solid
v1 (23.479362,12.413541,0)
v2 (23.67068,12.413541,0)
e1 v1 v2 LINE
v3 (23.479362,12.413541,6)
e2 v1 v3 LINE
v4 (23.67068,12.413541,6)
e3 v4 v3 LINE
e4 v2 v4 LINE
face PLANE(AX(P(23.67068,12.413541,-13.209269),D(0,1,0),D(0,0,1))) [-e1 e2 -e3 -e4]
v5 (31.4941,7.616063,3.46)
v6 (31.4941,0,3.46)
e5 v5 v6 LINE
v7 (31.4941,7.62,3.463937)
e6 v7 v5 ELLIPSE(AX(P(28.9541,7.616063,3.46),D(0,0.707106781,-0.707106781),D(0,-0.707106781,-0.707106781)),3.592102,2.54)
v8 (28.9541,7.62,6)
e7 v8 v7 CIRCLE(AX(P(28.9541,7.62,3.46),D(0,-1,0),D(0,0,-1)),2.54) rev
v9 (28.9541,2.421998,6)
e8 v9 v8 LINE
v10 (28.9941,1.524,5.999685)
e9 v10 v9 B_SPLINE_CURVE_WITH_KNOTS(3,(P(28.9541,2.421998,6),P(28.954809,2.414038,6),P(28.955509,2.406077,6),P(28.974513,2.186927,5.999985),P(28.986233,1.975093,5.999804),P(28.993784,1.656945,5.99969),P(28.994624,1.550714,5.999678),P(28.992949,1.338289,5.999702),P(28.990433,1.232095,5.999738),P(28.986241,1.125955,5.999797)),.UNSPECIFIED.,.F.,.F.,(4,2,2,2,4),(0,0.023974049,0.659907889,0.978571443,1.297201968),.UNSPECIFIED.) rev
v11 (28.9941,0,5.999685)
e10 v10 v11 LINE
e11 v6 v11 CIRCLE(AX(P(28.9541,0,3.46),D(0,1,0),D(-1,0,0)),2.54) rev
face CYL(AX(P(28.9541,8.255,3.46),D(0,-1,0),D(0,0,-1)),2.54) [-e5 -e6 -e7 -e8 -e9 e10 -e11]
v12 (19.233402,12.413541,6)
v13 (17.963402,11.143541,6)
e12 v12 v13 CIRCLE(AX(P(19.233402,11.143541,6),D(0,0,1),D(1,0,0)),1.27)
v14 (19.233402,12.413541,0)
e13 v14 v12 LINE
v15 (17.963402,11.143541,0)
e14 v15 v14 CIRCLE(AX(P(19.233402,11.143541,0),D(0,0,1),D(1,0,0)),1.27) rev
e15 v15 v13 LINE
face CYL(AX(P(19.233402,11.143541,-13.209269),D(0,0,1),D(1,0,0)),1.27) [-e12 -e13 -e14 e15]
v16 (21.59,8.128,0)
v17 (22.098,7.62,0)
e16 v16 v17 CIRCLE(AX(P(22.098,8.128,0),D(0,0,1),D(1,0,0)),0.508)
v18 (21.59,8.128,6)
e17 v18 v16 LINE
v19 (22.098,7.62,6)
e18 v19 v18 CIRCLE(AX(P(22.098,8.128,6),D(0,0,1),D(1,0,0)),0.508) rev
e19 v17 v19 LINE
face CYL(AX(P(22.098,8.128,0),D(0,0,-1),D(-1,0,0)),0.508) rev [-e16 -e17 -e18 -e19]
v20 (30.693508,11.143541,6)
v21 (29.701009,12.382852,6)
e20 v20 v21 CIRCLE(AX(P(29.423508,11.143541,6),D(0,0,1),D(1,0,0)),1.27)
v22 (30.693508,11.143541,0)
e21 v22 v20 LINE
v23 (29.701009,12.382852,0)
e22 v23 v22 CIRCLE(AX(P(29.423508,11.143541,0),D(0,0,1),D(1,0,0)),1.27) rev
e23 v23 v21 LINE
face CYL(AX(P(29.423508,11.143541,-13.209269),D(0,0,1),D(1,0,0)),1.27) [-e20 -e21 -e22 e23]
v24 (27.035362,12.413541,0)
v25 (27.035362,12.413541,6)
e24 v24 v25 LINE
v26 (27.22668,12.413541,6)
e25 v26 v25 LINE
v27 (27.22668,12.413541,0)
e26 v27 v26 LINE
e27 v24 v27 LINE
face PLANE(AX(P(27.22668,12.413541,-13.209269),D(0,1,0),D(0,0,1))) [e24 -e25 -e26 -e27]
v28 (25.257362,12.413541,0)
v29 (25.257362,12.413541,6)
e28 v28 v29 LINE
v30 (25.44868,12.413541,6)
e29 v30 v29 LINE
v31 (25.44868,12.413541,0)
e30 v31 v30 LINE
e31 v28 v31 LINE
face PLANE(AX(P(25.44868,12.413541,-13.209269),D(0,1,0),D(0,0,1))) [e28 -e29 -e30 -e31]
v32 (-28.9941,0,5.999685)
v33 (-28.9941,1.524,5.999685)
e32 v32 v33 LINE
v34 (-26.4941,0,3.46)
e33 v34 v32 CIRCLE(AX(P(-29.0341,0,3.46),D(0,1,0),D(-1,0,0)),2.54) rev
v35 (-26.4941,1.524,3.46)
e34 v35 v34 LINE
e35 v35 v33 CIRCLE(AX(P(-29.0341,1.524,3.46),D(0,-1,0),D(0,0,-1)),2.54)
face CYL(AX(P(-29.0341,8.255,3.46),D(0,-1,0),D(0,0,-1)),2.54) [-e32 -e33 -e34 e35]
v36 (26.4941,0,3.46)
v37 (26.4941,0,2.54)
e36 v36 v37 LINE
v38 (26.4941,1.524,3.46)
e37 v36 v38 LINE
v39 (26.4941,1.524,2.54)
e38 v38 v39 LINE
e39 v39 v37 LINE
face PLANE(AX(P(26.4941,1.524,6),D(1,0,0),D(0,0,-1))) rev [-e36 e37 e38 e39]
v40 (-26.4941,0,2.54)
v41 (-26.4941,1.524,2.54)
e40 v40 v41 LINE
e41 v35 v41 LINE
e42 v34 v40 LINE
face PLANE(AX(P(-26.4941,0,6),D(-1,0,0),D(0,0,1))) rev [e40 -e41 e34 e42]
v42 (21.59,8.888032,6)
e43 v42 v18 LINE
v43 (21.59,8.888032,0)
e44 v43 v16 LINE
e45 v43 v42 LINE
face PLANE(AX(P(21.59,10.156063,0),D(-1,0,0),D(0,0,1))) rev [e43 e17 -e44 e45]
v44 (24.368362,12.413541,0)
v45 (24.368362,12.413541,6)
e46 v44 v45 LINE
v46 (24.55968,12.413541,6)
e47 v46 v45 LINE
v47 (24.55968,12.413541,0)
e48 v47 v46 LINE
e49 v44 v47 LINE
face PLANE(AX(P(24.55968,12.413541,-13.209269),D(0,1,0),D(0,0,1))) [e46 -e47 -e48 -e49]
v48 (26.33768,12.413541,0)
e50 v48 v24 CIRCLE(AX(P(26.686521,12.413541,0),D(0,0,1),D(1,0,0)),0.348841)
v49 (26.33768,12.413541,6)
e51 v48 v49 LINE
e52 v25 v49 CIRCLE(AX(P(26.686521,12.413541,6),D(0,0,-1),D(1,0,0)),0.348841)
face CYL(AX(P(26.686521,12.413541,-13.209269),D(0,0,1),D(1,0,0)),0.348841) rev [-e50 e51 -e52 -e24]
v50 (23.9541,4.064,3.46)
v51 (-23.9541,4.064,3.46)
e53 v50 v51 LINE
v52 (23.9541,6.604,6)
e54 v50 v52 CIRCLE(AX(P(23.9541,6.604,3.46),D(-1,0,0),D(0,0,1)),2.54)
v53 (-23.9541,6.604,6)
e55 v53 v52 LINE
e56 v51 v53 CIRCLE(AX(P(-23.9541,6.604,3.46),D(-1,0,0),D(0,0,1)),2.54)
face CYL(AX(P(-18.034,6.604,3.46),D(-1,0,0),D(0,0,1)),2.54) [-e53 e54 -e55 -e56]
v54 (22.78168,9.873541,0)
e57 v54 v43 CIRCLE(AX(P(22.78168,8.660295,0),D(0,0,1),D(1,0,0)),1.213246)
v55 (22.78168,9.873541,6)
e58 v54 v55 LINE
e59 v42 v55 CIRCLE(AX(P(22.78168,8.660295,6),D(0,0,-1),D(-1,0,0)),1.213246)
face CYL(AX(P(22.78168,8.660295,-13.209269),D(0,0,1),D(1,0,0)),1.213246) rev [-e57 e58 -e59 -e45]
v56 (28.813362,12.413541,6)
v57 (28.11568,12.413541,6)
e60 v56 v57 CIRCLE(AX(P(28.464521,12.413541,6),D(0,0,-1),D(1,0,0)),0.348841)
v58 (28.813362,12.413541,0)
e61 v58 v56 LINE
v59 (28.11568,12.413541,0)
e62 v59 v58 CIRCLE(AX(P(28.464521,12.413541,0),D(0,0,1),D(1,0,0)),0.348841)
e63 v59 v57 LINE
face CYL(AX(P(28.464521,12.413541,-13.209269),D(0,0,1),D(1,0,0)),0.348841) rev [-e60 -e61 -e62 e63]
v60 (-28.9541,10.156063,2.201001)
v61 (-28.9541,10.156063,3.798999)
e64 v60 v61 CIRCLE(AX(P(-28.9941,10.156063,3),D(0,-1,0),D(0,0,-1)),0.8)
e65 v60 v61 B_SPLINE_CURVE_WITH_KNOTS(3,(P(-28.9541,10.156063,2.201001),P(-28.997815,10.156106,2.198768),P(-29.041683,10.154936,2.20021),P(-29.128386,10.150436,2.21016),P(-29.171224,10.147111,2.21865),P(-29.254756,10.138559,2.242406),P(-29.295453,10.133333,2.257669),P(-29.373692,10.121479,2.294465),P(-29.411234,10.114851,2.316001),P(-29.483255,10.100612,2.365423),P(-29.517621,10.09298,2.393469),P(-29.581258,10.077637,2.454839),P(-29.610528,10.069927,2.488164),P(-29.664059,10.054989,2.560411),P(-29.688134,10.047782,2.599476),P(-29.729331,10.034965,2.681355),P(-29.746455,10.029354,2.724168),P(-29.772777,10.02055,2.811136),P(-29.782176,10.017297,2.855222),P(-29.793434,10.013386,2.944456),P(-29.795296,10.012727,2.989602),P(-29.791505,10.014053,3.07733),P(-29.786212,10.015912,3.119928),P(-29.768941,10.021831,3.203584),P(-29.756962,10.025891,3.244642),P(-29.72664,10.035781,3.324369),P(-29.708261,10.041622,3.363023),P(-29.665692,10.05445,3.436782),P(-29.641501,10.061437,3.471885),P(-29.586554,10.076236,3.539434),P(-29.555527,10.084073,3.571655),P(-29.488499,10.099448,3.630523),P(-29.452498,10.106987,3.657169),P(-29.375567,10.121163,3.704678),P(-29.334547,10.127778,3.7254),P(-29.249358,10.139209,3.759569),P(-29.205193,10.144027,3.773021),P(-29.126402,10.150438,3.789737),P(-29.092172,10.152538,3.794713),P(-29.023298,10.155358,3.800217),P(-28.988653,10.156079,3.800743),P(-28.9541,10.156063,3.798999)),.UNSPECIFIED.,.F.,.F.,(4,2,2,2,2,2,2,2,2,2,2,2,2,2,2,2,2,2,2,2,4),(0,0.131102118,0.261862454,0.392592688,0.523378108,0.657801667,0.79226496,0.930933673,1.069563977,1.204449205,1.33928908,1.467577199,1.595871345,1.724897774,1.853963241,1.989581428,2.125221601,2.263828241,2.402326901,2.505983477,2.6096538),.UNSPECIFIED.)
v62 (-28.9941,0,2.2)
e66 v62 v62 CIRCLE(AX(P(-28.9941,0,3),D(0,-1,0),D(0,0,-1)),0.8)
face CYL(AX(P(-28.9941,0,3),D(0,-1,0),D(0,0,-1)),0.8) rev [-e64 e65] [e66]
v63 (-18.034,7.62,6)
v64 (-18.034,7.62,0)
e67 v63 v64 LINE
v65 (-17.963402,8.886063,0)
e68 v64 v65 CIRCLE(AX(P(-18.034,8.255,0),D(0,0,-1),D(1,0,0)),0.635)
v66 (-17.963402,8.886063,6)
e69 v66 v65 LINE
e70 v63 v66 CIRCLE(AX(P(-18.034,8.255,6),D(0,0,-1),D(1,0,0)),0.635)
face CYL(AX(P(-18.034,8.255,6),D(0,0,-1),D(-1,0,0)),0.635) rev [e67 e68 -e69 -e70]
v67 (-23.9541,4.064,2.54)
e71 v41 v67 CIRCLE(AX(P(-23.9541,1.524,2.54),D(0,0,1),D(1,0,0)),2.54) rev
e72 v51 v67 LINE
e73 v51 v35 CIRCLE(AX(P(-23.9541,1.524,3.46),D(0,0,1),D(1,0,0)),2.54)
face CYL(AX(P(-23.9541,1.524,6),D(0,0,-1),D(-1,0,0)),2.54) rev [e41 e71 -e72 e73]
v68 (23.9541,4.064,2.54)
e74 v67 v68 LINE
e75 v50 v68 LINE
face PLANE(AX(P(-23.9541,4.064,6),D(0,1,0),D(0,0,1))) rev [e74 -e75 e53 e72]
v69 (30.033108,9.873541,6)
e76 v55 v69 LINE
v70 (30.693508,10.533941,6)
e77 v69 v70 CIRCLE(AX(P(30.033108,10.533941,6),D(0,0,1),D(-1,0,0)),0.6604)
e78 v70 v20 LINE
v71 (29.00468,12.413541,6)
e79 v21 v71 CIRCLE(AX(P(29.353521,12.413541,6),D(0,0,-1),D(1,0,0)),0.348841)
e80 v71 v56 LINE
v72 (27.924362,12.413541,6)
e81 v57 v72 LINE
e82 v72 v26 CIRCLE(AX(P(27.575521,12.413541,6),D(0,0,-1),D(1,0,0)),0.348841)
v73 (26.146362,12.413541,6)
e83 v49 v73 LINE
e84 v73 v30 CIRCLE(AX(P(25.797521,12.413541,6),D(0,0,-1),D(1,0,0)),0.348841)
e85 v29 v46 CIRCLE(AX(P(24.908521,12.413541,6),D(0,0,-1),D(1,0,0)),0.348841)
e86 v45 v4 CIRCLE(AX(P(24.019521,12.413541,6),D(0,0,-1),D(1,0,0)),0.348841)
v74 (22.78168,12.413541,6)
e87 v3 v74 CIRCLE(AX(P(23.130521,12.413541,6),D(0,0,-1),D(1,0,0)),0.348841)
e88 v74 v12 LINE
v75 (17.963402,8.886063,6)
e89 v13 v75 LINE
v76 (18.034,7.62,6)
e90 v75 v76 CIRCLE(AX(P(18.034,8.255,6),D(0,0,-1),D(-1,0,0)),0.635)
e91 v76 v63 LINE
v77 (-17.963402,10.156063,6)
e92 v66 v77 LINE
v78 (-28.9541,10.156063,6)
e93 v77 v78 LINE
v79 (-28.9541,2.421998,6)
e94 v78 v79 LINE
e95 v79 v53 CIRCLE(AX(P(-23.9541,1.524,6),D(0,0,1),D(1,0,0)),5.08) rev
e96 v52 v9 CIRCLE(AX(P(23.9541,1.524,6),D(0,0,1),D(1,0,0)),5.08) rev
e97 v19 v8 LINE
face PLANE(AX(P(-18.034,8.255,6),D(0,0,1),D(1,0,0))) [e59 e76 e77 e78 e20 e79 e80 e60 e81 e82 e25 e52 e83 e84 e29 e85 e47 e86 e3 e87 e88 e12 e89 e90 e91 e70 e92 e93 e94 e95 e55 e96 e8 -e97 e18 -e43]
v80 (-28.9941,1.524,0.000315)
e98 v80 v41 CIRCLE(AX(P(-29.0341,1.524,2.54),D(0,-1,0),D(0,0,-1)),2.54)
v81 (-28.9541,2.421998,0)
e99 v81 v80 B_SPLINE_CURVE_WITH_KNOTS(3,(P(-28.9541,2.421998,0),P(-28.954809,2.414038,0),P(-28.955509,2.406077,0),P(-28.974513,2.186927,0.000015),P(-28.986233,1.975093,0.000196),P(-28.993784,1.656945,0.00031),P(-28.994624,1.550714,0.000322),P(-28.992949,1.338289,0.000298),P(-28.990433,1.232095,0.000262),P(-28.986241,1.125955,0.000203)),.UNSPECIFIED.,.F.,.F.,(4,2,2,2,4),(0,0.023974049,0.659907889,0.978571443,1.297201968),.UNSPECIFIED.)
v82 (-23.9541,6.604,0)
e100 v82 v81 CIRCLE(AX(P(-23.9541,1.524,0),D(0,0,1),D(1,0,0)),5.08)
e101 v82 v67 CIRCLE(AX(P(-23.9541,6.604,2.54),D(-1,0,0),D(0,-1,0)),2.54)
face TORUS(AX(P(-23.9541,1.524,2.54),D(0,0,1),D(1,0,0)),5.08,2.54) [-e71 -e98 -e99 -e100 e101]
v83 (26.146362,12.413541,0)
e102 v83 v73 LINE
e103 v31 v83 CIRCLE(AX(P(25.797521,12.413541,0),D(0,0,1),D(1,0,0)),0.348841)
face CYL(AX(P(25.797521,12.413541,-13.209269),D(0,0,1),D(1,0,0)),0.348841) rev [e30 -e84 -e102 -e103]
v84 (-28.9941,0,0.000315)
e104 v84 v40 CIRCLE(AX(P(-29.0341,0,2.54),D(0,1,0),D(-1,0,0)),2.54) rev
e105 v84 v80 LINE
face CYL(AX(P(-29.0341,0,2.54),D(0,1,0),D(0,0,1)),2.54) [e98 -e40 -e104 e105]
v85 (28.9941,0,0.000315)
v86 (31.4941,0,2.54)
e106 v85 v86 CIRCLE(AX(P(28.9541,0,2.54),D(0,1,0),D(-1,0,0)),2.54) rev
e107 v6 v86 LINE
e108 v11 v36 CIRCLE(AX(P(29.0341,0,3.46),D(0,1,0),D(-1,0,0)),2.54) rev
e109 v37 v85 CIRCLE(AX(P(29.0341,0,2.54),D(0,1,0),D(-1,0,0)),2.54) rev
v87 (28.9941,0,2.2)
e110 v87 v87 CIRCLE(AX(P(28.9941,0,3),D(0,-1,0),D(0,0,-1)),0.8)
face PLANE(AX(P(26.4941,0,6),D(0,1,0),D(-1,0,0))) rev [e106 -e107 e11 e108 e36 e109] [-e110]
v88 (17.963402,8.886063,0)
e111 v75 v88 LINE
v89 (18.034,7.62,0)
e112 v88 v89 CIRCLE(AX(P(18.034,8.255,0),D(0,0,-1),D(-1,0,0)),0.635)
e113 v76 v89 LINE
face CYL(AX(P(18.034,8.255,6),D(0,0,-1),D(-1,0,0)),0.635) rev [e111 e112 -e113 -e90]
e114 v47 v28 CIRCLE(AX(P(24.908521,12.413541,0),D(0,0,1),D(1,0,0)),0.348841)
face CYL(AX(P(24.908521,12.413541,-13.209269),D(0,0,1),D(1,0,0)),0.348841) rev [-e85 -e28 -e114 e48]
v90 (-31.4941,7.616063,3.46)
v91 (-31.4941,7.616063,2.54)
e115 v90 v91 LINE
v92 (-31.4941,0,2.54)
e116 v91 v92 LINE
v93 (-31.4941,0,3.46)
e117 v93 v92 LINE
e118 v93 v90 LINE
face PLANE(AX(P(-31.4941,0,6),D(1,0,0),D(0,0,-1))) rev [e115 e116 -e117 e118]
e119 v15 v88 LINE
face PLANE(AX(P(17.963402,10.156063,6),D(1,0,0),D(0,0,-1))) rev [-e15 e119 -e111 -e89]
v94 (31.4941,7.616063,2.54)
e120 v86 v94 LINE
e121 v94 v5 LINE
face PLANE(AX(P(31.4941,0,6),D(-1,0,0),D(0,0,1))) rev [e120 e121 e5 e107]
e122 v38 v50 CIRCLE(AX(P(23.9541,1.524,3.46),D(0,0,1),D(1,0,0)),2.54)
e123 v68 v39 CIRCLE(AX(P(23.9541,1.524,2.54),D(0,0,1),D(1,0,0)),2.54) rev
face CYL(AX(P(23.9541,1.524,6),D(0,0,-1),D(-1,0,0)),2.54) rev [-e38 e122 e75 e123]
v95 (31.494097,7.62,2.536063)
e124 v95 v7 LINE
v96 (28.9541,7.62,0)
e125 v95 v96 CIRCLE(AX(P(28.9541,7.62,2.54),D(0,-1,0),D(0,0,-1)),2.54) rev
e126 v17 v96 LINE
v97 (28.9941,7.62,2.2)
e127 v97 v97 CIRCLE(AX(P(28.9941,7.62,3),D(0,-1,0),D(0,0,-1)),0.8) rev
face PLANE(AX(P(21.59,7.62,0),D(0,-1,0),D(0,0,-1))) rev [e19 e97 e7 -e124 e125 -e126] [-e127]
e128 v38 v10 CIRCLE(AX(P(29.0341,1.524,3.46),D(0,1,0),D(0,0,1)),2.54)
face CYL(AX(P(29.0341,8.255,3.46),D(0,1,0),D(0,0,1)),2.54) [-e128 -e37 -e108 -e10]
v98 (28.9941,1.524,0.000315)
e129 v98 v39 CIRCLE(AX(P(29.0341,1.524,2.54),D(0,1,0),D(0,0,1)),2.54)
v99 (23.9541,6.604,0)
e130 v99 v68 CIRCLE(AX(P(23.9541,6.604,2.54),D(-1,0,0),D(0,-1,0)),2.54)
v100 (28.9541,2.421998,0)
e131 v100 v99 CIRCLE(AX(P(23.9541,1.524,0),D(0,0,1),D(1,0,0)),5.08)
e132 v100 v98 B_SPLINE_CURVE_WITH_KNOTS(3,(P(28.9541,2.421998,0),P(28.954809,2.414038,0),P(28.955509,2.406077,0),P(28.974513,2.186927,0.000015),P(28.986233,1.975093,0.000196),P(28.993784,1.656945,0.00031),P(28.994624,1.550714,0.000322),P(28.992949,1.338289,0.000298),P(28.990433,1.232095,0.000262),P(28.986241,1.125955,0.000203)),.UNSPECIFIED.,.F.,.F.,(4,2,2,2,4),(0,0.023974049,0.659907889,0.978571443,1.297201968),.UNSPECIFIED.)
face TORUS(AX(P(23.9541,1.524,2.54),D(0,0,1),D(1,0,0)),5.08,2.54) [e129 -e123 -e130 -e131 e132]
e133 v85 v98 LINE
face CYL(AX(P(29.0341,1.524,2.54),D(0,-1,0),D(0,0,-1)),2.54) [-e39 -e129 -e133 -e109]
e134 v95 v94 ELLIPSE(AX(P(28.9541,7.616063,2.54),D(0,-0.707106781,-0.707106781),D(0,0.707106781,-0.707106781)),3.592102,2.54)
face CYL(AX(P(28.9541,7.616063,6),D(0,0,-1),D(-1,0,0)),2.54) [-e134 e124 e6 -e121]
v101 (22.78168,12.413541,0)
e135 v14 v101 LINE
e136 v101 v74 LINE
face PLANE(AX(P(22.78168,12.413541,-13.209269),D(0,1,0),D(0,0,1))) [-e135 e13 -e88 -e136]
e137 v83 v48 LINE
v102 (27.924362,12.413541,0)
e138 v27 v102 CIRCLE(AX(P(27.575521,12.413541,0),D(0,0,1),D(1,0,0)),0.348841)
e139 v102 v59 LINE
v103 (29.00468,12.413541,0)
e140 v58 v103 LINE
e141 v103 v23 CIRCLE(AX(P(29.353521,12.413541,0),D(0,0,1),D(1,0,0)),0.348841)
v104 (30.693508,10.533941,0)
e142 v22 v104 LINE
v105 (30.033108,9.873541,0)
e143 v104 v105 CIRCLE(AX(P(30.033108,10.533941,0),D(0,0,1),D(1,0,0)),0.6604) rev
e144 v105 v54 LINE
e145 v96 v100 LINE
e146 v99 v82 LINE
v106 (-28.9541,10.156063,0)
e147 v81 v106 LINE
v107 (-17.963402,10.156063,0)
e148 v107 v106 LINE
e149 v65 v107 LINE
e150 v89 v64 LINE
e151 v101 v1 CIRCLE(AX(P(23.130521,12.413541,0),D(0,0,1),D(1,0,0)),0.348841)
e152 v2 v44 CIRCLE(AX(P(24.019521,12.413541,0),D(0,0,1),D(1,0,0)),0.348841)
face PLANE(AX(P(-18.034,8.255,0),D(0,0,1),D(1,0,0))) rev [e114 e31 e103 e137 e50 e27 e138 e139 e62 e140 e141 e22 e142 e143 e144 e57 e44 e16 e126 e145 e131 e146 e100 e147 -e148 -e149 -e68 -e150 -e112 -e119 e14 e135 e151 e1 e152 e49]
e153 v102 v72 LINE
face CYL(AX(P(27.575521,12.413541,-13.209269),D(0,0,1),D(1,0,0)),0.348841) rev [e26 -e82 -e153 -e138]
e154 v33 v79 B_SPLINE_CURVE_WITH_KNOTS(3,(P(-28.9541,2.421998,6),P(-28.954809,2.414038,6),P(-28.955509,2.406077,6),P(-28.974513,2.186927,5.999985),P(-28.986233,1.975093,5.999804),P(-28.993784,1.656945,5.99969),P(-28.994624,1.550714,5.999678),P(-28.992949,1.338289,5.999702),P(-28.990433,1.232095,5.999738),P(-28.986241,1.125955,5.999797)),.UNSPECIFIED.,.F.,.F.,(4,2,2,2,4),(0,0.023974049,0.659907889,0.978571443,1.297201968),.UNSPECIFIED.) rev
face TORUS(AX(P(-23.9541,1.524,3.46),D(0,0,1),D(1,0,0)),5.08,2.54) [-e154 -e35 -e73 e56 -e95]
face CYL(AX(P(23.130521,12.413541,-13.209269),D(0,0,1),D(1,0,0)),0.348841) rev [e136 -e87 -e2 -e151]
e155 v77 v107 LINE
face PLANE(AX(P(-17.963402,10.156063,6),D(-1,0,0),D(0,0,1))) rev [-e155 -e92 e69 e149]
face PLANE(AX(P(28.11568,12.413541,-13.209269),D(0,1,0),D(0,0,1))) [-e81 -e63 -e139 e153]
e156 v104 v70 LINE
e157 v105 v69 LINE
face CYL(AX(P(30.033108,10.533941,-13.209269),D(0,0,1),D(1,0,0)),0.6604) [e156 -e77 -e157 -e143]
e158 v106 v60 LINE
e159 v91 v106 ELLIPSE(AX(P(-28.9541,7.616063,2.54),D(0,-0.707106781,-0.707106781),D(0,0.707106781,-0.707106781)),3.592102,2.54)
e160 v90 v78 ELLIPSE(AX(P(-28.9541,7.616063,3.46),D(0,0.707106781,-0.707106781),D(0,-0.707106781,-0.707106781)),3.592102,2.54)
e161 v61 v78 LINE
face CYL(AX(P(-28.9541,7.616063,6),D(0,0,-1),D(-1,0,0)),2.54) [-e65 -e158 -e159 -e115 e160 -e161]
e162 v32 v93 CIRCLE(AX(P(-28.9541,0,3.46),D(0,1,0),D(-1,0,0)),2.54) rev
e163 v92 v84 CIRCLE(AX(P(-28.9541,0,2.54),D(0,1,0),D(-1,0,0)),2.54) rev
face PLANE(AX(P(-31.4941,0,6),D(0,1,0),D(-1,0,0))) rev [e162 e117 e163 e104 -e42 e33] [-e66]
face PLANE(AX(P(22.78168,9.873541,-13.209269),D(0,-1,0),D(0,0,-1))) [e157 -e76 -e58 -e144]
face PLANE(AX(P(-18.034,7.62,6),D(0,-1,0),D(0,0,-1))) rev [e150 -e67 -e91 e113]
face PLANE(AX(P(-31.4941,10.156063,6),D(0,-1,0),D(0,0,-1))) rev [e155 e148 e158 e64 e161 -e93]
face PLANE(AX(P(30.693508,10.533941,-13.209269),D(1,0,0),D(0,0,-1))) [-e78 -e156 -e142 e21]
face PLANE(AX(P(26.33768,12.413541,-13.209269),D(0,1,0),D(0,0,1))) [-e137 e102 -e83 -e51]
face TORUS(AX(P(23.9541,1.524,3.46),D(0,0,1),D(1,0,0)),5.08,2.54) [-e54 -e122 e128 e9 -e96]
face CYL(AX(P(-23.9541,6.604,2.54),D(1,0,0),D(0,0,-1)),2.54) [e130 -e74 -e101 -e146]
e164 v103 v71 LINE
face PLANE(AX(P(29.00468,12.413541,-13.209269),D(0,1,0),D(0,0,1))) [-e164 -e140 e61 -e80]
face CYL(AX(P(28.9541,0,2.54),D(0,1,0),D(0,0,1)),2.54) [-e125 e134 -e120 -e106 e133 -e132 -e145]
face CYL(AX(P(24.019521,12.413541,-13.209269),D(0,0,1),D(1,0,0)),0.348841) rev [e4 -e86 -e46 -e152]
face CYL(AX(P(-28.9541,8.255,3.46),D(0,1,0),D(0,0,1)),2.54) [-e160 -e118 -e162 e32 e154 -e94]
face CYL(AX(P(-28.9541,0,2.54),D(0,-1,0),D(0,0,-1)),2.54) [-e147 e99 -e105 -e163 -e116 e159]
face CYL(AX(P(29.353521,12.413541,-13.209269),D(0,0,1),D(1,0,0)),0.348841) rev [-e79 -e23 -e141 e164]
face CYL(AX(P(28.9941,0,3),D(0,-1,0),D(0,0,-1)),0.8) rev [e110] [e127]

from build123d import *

# Parameters (mm, degrees)
BOSS_EXTRUDE1_DEPTH   = 6
M2X0_4_TAPPED_HOLE1_D = 1.6
FILLET1_R             = 2.54
SKETCH4_W             = 9.9041
SKETCH4_H             = 2.536063356
CUT_EXTRUDE1_DEPTH    = 34.630699773
BOSS_EXTRUDE2_DEPTH   = 6
FILLET2_R             = 0.508


with BuildPart() as part:
    # Sketch1 → Boss-Extrude1 (new body)
    with BuildSketch(Plane.XY):
        with BuildLine():
            Line((-31.4941, 0), (-26.4941, 0))
            Line((-26.4941, 0), (-26.4941, 1.524))
            ThreePointArc((-26.4941, 1.524), (-25.750151224, 3.320051224), (-23.9541, 4.064))
            Line((-23.9541, 4.064), (23.9541, 4.064))
            ThreePointArc((23.9541, 4.064), (25.750151224, 3.320051224), (26.4941, 1.524))
            Line((26.4941, 1.524), (26.4941, 0))
            Line((26.4941, 0), (31.4941, 0))
            Line((31.4941, 0), (31.4941, 10.156063356))
            Line((31.4941, 10.156063356), (17.963402264, 10.156063356))
            Line((17.963402264, 10.156063356), (17.963402264, 8.886063356))
            ThreePointArc((17.963402264, 8.886063356), (18.668015075, 8.290353704), (18.034, 7.62))
            Line((18.034, 7.62), (-18.034, 7.62))
            ThreePointArc((-18.034, 7.62), (-18.668015075, 8.290353704), (-17.963402264, 8.886063356))
            Line((-17.963402264, 8.886063356), (-17.963402264, 10.156063356))
            Line((-17.963402264, 10.156063356), (-31.4941, 10.156063356))
            Line((-31.4941, 10.156063356), (-31.4941, 0))
        make_face()
    extrude(amount=BOSS_EXTRUDE1_DEPTH)

    # M2x0.4 Tapped Hole1 (through all)
    with Locations(Plane(origin=(0, 0, 0), x_dir=(-1, 0, 0), z_dir=(0, -1, 0))):
        with Locations((28.9941, -3), (-28.9941, -3)):
            Hole(M2X0_4_TAPPED_HOLE1_D / 2)

    # Fillet1
    # the kernel refuses this fillet: 2.54 mm, written as the material it takes off along each edge
    with BuildSketch(Plane(origin=(-26.4941, -6.35, 0), x_dir=(-1, 0, 0), z_dir=(0, 1, 0)), Plane(origin=(26.4941, 1.524, 0), x_dir=(1, 0, 0), z_dir=(0, -1, 0))) as fillet1_piece_1:
        with BuildLine():
            CenterArc((FILLET1_R, FILLET1_R), FILLET1_R, 180, 90)
            Line((0, FILLET1_R), (0, 0))
            Line((0, 0), (FILLET1_R, 0))
        make_face()
    extrude(amount=7.874, mode=Mode.SUBTRACT)
    with BuildSketch(Plane(origin=(-23.9541, 1.524, 0), x_dir=(-1, 0, 0), z_dir=(0, -1, 0))) as fillet1_piece_2:
        with BuildLine():
            CenterArc((2.54 + FILLET1_R, -FILLET1_R), FILLET1_R, 90, 90)
            Line((2.54, -FILLET1_R), (2.54, 0))
            Line((2.54, 0), (2.54 + FILLET1_R, 0))
        make_face()
    revolve(axis=Axis((-23.9541, 1.524, 0), (0, 0, -1)), revolution_arc=90, mode=Mode.SUBTRACT)
    with BuildSketch(Plane(origin=(23.9541, 1.524, 0), x_dir=(0, 1, 0), z_dir=(-1, 0, 0))) as fillet1_piece_3:
        with BuildLine():
            CenterArc((2.54 + FILLET1_R, -FILLET1_R), FILLET1_R, 90, 90)
            Line((2.54, -FILLET1_R), (2.54, 0))
            Line((2.54, 0), (2.54 + FILLET1_R, 0))
        make_face()
    revolve(axis=Axis((23.9541, 1.524, 0), (0, 0, -1)), revolution_arc=90, mode=Mode.SUBTRACT)
    with BuildSketch(Plane(origin=(-26.4941, -6.35, 6), x_dir=(-1, 0, 0), z_dir=(0, 1, 0)), Plane(origin=(26.4941, 1.524, 6), x_dir=(1, 0, 0), z_dir=(0, -1, 0))) as fillet1_piece_4:
        with BuildLine():
            CenterArc((FILLET1_R, -FILLET1_R), FILLET1_R, 90, 90)
            Line((0, -FILLET1_R), (0, 0))
            Line((0, 0), (FILLET1_R, 0))
        make_face()
    extrude(amount=7.874, mode=Mode.SUBTRACT)
    with BuildSketch(Plane(origin=(-23.9541, 1.524, 6), x_dir=(-1, 0, 0), z_dir=(0, -1, 0))) as fillet1_piece_5:
        with BuildLine():
            CenterArc((2.54 + FILLET1_R, FILLET1_R), FILLET1_R, 180, 90)
            Line((2.54, FILLET1_R), (2.54, 0))
            Line((2.54, 0), (2.54 + FILLET1_R, 0))
        make_face()
    revolve(axis=Axis((-23.9541, 1.524, 6), (0, 0, -1)), revolution_arc=90, mode=Mode.SUBTRACT)
    with BuildSketch(Plane(origin=(-23.9541, 4.064, 6), x_dir=(0, 1, 0), z_dir=(1, 0, 0))) as fillet1_piece_6:
        with BuildLine():
            CenterArc((FILLET1_R, -FILLET1_R), FILLET1_R, 90, 90)
            Line((0, -FILLET1_R), (0, 0))
            Line((0, 0), (FILLET1_R, 0))
        make_face()
    extrude(amount=47.9082, mode=Mode.SUBTRACT)
    with BuildSketch(Plane(origin=(23.9541, 1.524, 6), x_dir=(0, 1, 0), z_dir=(-1, 0, 0))) as fillet1_piece_7:
        with BuildLine():
            CenterArc((2.54 + FILLET1_R, FILLET1_R), FILLET1_R, 180, 90)
            Line((2.54, FILLET1_R), (2.54, 0))
            Line((2.54, 0), (2.54 + FILLET1_R, 0))
        make_face()
    revolve(axis=Axis((23.9541, 1.524, 6), (0, 0, -1)), revolution_arc=90, mode=Mode.SUBTRACT)
    with BuildSketch(Plane(origin=(-31.4941, 16.506063356, 0), x_dir=(1, 0, 0), z_dir=(0, -1, 0)), Plane(origin=(31.4941, -6.35, 0), x_dir=(-1, 0, 0), z_dir=(0, 1, 0))) as fillet1_piece_8:
        with BuildLine():
            CenterArc((FILLET1_R, FILLET1_R), FILLET1_R, 180, 90)
            Line((0, FILLET1_R), (0, 0))
            Line((0, 0), (FILLET1_R, 0))
        make_face()
    extrude(amount=22.856063356, mode=Mode.SUBTRACT)
    with BuildSketch(Plane(origin=(-31.4941, 16.506063356, 6), x_dir=(1, 0, 0), z_dir=(0, -1, 0)), Plane(origin=(31.4941, -6.35, 6), x_dir=(-1, 0, 0), z_dir=(0, 1, 0))) as fillet1_piece_9:
        with BuildLine():
            CenterArc((FILLET1_R, -FILLET1_R), FILLET1_R, 90, 90)
            Line((0, -FILLET1_R), (0, 0))
            Line((0, 0), (FILLET1_R, 0))
        make_face()
    extrude(amount=22.856063356, mode=Mode.SUBTRACT)
    with BuildSketch(Plane(origin=(-23.9541, 4.064, 0), x_dir=(0, 1, 0), z_dir=(1, 0, 0))) as fillet1_piece_10:
        with BuildLine():
            CenterArc((FILLET1_R, FILLET1_R), FILLET1_R, 180, 90)
            Line((0, FILLET1_R), (0, 0))
            Line((0, 0), (FILLET1_R, 0))
        make_face()
    extrude(amount=47.9082, mode=Mode.SUBTRACT)
    with BuildSketch(Plane(origin=(31.4941, 10.156063356, -6.35), x_dir=(0, -1, 0), z_dir=(0, 0, 1)), Plane(origin=(-31.4941, 10.156063356, -6.35), x_dir=(1, 0, 0), z_dir=(0, 0, 1))) as fillet1_piece_11:
        with BuildLine():
            CenterArc((FILLET1_R, -FILLET1_R), FILLET1_R, 90, 90)
            Line((0, -FILLET1_R), (0, 0))
            Line((0, 0), (FILLET1_R, 0))
        make_face()
    extrude(amount=18.7, mode=Mode.SUBTRACT)

    # Sketch4 → Cut-Extrude1 (cut, through all)
    with BuildSketch(Plane.XY.offset(6)):
        with Locations((26.54205, 8.888031678)):
            Rectangle(SKETCH4_W, SKETCH4_H)
    extrude(amount=-CUT_EXTRUDE1_DEPTH, mode=Mode.SUBTRACT)

    # Sketch5 → Boss-Extrude2 (add)
    with BuildSketch(Plane.XY.offset(6)):
        with BuildLine():
            Line((22.781680466, 9.873540862), (30.033107734, 9.873540862))
            ThreePointArc((30.033107734, 9.873540862), (30.500081052, 10.066967543), (30.693507734, 10.533940862))
            Line((30.693507734, 10.533940862), (30.693507734, 11.143540862))
            ThreePointArc((30.693507734, 11.143540862), (30.414801602, 11.937415201), (29.701009362, 12.382852302))
            ThreePointArc((29.701009362, 12.382852302), (29.338161991, 12.065038452), (29.004680466, 12.413540862))
            Line((29.004680466, 12.413540862), (28.813361866, 12.413540862))
            ThreePointArc((28.813361866, 12.413540862), (28.464521166, 12.064700162), (28.115680466, 12.413540862))
            Line((28.115680466, 12.413540862), (27.924361866, 12.413540862))
            ThreePointArc((27.924361866, 12.413540862), (27.575521166, 12.064700162), (27.226680466, 12.413540862))
            Line((27.226680466, 12.413540862), (27.035361866, 12.413540862))
            ThreePointArc((27.035361866, 12.413540862), (26.686521166, 12.064700162), (26.337680466, 12.413540862))
            Line((26.337680466, 12.413540862), (26.146361866, 12.413540862))
            ThreePointArc((26.146361866, 12.413540862), (25.797521166, 12.064700162), (25.448680466, 12.413540862))
            Line((25.448680466, 12.413540862), (25.257361866, 12.413540862))
            ThreePointArc((25.257361866, 12.413540862), (24.908521166, 12.064700162), (24.559680466, 12.413540862))
            Line((24.559680466, 12.413540862), (24.368361866, 12.413540862))
            ThreePointArc((24.368361866, 12.413540862), (24.019521166, 12.064700162), (23.670680466, 12.413540862))
            Line((23.670680466, 12.413540862), (23.479361866, 12.413540862))
            ThreePointArc((23.479361866, 12.413540862), (23.130521166, 12.064700162), (22.781680466, 12.413540862))
            Line((22.781680466, 12.413540862), (19.233402264, 12.413540862))
            ThreePointArc((19.233402264, 12.413540862), (18.335376652, 12.041566474), (17.963402264, 11.143540862))
            Line((17.963402264, 11.143540862), (17.963402264, 10.156063356))
            Line((17.963402264, 10.156063356), (21.59, 10.156063356))
            Line((21.59, 10.156063356), (21.59, 8.888031678))
            ThreePointArc((21.59, 8.888031678), (22.008484067, 9.595245842), (22.781680466, 9.873540862))
        make_face()
    extrude(amount=-BOSS_EXTRUDE2_DEPTH)

    # Fillet2
    fillet2_edges = [part.edges().sort_by_distance(p)[0] for p in [
        (21.59, 7.62, 3),
    ]]
    fillet(fillet2_edges, radius=FILLET2_R)


solid = part.part
